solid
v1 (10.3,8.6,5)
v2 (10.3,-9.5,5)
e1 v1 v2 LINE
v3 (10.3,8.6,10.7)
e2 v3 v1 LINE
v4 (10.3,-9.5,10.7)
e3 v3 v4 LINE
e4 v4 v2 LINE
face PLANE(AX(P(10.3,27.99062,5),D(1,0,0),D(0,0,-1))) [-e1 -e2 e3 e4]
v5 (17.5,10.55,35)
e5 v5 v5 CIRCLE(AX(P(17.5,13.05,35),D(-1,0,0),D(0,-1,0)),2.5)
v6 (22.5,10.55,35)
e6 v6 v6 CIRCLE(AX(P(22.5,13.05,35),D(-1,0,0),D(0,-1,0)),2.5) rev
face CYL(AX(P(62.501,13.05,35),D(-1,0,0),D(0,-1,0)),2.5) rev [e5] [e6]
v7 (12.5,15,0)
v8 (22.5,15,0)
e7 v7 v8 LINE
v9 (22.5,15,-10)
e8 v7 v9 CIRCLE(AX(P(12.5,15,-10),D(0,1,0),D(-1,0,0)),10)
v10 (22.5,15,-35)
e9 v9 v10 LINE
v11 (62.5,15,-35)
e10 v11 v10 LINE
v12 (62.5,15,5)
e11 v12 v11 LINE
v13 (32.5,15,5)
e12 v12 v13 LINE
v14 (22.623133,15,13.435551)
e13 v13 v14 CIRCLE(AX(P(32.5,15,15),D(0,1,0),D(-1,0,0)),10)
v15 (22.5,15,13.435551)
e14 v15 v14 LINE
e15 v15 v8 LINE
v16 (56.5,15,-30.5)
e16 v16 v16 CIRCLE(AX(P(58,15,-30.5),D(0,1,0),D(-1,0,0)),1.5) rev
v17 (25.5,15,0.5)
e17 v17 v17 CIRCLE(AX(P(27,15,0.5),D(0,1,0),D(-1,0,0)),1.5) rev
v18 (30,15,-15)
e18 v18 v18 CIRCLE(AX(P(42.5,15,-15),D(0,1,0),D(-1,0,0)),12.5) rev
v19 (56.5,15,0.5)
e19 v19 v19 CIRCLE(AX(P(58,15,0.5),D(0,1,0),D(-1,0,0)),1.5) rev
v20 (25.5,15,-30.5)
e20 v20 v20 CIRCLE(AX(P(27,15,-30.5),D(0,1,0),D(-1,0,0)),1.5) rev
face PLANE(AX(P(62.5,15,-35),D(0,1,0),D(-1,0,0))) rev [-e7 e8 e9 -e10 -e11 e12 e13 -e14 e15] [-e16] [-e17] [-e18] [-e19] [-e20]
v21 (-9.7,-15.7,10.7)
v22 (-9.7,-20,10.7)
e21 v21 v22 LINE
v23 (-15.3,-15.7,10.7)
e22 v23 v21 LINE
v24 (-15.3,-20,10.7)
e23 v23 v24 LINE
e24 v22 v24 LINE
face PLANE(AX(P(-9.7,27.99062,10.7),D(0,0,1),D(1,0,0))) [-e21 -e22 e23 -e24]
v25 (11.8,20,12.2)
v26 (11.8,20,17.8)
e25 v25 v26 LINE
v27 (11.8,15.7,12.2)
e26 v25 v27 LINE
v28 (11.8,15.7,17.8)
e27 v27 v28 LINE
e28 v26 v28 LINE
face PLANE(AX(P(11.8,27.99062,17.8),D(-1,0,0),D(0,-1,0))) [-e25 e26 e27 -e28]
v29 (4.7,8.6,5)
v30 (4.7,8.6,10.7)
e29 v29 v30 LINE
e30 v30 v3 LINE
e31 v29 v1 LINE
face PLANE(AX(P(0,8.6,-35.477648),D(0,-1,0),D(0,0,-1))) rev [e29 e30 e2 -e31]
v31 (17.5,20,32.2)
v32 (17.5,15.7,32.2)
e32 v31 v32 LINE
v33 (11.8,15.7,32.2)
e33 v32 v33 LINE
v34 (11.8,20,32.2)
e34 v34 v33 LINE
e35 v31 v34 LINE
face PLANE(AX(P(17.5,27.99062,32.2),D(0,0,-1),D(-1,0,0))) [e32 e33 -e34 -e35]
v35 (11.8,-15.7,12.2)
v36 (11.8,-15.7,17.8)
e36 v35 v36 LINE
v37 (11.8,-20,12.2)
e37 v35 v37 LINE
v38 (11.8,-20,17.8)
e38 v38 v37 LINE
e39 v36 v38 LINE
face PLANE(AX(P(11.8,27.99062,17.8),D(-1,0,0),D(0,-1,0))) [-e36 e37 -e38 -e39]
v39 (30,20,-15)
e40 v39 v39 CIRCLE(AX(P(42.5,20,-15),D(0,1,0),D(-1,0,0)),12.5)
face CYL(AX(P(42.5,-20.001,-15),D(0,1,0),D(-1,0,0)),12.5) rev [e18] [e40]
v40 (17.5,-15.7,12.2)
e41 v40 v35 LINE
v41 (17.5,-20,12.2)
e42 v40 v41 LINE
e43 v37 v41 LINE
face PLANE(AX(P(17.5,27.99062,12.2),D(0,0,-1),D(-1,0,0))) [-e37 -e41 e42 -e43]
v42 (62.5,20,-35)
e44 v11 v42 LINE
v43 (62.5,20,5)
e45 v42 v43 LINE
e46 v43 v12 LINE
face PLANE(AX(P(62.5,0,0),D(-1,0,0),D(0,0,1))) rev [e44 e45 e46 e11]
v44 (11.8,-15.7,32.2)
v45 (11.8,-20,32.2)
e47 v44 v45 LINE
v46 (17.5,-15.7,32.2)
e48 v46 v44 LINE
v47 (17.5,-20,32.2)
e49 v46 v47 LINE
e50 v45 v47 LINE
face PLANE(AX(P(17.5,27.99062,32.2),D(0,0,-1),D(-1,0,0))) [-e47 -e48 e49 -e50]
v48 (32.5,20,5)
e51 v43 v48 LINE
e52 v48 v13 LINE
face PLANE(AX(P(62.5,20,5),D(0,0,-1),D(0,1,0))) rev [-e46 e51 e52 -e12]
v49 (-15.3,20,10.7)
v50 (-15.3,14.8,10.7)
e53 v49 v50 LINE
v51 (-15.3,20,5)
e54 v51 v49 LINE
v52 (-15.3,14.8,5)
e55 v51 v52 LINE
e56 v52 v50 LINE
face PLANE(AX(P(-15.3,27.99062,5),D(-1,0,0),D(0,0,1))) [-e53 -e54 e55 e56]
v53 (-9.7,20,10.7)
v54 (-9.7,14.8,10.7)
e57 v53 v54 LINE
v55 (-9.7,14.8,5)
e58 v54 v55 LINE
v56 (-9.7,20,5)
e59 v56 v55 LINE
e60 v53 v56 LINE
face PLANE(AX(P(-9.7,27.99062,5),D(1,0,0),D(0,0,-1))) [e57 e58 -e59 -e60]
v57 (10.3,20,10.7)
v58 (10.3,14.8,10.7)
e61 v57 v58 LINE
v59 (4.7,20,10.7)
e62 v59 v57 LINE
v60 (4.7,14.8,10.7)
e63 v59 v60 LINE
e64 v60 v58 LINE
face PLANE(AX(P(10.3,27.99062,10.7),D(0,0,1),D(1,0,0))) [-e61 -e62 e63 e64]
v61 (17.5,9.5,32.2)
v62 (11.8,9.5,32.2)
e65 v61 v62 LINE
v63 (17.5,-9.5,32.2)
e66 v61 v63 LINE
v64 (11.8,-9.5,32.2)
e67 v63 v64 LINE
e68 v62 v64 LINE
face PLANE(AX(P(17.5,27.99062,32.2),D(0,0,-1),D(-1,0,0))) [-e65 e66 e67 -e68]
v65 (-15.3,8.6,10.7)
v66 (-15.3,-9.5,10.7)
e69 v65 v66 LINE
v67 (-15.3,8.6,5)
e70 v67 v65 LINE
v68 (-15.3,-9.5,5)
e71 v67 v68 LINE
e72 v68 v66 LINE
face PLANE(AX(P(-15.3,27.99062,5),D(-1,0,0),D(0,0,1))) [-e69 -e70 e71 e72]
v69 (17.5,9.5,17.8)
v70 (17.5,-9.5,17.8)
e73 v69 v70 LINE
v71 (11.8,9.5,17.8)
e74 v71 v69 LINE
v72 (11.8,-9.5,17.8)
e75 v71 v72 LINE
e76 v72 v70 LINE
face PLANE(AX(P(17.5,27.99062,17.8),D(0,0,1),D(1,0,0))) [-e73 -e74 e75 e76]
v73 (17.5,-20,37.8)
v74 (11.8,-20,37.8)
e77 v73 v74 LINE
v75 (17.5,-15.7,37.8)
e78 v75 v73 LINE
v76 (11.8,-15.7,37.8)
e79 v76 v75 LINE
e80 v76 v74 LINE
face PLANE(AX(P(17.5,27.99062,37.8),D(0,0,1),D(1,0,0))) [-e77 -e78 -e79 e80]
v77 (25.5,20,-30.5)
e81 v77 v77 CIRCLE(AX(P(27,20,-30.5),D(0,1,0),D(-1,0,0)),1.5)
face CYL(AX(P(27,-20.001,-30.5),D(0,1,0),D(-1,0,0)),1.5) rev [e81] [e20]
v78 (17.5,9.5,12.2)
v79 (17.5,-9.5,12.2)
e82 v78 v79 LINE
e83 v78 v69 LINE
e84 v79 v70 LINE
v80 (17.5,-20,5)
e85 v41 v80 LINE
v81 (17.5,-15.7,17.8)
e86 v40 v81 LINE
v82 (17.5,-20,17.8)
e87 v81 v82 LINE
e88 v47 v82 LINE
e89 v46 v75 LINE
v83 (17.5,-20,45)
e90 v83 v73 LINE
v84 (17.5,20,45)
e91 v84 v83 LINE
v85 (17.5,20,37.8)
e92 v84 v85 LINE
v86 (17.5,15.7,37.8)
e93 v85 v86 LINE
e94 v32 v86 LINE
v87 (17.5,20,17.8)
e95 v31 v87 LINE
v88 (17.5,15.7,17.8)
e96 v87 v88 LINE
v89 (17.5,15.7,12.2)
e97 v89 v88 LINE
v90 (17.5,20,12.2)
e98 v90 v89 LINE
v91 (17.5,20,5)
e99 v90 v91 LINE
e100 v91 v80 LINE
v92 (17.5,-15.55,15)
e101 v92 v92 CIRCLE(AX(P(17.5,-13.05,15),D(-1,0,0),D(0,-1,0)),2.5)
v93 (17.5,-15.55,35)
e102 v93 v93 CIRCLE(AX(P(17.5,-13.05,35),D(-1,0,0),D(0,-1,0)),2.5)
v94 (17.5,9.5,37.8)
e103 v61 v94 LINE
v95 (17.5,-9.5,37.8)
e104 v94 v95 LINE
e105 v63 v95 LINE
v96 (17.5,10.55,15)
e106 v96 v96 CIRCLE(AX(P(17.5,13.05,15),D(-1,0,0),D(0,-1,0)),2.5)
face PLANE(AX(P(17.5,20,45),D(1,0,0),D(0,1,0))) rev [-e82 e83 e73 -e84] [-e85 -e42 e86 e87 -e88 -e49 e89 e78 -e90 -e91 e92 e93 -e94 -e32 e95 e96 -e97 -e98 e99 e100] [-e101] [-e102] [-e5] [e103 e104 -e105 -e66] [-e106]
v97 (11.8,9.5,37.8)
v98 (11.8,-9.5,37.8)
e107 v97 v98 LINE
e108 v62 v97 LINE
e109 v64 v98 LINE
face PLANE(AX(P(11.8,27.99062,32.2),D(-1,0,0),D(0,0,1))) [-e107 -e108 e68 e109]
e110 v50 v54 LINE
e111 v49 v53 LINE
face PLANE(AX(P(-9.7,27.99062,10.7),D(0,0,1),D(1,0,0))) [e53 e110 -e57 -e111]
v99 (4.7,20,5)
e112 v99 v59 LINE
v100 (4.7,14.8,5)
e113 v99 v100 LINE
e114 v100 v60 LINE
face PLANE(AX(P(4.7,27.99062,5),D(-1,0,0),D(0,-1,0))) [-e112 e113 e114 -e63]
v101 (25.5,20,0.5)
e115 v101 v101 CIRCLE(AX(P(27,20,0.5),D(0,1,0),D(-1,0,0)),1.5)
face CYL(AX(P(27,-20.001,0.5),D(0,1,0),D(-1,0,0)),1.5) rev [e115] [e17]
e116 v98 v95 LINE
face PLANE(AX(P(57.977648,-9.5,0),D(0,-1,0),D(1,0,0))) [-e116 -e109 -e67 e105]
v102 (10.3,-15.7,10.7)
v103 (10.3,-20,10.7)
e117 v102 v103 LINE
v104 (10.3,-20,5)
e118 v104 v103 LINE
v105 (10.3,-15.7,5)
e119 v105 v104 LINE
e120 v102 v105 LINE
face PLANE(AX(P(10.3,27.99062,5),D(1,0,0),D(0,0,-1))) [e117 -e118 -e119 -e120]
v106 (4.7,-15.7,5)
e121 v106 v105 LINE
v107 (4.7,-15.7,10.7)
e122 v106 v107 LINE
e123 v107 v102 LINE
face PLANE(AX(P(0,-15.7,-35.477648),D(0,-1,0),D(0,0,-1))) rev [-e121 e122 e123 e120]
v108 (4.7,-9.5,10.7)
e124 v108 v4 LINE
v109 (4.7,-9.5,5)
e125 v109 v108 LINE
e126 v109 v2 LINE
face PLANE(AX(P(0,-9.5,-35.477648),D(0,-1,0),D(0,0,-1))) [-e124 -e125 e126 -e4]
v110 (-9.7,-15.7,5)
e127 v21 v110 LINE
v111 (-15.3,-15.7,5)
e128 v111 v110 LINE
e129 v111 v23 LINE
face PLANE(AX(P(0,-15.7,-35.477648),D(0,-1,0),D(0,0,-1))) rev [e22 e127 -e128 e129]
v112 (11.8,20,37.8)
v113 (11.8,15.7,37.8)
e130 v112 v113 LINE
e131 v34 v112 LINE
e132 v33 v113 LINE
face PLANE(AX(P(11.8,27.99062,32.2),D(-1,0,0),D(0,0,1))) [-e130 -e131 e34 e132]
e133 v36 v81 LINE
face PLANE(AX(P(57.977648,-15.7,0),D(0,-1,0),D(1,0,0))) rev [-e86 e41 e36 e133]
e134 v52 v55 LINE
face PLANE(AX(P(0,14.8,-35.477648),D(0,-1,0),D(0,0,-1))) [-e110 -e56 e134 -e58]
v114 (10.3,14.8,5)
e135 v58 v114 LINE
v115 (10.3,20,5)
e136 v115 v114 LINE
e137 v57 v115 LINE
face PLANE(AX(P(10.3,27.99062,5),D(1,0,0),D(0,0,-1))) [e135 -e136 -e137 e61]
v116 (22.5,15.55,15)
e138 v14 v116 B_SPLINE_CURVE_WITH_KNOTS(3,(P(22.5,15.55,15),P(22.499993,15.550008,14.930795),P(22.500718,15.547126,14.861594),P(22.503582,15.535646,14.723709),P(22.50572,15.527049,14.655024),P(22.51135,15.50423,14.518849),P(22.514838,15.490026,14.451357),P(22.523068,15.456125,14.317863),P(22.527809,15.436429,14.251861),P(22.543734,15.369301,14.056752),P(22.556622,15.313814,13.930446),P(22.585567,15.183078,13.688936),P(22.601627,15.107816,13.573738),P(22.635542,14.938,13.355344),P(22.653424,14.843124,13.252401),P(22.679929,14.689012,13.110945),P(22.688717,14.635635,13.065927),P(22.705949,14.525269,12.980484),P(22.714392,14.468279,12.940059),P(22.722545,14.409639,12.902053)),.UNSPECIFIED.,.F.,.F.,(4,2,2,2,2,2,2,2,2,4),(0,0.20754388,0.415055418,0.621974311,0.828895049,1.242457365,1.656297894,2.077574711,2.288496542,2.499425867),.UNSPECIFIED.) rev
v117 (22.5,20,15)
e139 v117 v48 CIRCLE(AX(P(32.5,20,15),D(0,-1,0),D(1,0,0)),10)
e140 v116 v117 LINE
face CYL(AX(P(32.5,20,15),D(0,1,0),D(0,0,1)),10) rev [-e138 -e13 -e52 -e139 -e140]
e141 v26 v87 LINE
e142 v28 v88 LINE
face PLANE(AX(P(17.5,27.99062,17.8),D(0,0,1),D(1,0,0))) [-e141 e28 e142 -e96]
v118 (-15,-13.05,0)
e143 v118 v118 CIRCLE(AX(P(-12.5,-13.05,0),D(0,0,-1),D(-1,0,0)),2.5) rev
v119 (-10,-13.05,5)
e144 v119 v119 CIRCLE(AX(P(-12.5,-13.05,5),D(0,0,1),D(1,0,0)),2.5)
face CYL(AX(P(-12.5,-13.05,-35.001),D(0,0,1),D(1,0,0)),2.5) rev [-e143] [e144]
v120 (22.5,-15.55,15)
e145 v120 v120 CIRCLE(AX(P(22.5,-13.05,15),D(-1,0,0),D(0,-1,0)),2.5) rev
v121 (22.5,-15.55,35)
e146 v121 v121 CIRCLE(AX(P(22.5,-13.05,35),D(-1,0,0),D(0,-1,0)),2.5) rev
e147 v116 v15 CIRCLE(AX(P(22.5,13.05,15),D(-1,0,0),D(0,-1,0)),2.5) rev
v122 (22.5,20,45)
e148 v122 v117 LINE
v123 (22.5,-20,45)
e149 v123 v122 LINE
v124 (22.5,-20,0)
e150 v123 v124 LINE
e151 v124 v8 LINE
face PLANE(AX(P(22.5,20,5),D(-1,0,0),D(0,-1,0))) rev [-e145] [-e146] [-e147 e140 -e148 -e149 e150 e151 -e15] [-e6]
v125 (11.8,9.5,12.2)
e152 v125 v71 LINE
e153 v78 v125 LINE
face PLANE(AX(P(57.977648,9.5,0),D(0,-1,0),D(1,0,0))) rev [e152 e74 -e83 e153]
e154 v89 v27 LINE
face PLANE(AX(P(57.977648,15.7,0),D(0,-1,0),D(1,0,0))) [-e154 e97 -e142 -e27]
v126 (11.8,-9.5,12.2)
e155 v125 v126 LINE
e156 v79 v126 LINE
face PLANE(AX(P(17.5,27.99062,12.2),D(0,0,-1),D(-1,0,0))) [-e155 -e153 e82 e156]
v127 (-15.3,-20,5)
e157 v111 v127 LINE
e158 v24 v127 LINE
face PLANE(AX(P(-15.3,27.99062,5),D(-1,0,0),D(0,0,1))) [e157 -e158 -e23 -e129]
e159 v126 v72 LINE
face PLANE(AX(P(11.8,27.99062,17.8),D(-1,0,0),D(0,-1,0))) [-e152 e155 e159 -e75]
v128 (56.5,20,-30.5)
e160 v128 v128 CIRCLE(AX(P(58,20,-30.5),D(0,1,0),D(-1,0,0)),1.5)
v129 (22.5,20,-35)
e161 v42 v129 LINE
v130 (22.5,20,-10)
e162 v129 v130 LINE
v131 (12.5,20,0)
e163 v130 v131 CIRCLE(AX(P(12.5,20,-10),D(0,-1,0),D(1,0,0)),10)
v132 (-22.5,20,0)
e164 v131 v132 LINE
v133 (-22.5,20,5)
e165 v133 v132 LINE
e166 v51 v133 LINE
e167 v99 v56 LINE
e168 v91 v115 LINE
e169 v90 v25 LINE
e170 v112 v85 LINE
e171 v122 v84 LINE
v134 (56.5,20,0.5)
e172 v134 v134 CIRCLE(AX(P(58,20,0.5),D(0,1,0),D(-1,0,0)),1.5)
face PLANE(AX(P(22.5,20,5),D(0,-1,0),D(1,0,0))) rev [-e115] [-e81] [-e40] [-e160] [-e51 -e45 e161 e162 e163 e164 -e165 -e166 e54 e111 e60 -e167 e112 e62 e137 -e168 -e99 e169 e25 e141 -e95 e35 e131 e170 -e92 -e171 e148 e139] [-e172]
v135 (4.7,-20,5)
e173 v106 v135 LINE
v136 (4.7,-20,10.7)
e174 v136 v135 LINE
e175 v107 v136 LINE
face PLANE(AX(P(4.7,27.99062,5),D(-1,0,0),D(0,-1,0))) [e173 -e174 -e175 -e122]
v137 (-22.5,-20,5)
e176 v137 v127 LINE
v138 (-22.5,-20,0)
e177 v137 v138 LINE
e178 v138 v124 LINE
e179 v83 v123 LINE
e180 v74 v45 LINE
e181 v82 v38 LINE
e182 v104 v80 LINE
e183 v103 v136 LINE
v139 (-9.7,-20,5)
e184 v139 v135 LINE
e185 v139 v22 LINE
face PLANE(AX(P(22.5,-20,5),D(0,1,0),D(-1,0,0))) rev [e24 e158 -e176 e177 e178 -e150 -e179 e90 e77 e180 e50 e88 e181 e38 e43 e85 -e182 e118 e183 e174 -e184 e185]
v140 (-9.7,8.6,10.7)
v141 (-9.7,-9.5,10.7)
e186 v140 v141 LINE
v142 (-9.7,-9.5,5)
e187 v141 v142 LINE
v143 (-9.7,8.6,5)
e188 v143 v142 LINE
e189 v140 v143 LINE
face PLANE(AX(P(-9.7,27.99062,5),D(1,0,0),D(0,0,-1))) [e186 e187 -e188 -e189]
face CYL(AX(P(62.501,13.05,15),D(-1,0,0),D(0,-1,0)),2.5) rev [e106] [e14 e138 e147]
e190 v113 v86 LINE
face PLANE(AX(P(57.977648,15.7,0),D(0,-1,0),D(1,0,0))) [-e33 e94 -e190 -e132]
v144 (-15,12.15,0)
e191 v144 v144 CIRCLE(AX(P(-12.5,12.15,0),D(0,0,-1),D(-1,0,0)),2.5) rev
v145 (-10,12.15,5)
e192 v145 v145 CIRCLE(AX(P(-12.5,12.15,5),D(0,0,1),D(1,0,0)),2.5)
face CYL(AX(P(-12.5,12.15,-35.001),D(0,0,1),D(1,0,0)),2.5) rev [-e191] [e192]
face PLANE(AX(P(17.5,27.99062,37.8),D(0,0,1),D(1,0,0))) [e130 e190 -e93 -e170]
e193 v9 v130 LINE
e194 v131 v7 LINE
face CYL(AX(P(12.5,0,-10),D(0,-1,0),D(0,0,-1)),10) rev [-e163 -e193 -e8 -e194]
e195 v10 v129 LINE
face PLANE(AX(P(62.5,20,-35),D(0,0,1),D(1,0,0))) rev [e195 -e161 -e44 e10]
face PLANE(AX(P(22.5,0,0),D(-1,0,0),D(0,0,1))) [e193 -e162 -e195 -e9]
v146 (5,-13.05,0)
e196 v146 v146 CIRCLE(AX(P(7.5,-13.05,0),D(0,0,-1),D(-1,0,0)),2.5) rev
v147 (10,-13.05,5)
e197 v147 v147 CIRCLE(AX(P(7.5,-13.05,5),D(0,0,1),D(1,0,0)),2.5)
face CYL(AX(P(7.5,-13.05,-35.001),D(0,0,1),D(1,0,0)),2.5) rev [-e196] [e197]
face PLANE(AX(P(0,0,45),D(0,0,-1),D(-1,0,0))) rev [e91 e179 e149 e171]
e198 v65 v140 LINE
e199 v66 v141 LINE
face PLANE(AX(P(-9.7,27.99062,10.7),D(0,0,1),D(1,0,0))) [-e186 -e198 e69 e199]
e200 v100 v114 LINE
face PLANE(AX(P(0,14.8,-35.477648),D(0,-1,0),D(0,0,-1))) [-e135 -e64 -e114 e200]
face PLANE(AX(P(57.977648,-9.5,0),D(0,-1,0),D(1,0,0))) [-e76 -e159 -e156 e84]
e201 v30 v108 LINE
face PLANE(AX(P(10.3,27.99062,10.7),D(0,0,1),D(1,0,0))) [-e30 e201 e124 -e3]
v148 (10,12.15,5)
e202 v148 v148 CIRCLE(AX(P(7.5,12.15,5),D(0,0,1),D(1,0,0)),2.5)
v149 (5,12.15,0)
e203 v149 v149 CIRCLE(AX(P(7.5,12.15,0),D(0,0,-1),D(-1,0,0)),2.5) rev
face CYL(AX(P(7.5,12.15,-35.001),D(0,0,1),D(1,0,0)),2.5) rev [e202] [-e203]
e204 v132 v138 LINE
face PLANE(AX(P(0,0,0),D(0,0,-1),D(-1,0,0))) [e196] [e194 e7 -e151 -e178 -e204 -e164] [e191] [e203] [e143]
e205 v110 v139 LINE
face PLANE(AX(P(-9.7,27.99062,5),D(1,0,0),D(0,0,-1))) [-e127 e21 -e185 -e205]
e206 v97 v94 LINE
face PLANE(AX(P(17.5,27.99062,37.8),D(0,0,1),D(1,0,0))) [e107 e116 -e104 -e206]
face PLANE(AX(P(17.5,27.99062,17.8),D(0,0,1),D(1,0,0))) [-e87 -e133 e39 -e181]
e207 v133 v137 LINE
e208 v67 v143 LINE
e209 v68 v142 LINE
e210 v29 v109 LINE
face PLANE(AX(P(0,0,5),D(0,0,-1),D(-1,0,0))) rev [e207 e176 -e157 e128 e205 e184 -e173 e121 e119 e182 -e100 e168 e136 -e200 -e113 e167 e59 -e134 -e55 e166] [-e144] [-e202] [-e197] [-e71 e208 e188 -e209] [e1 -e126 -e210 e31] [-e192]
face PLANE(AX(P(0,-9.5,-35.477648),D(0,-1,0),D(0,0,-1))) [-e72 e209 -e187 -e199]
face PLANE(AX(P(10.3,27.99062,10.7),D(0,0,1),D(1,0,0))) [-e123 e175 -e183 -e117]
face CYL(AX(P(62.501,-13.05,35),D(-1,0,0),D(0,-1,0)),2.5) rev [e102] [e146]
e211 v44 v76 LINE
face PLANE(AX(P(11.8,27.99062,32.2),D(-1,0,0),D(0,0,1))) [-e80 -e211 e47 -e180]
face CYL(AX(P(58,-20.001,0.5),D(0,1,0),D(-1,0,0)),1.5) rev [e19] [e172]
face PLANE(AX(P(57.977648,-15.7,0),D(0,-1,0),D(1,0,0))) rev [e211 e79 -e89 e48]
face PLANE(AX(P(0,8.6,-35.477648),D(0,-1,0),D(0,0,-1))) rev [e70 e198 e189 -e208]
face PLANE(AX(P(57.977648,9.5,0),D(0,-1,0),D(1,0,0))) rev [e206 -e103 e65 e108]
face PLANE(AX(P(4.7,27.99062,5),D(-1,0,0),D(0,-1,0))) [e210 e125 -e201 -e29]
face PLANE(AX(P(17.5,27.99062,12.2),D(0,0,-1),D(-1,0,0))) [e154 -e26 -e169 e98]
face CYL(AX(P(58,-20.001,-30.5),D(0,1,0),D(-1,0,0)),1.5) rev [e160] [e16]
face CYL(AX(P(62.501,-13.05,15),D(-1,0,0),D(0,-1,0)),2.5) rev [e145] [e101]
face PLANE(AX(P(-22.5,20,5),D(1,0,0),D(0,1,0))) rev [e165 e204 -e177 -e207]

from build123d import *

# Parameters (mm, degrees)
CROQUIS1_W              = 45
CROQUIS1_H              = 40
SALIENTE_EXTRUIR1_DEPTH = 5
CROQUIS2_W              = 5
CROQUIS2_H              = 40
SALIENTE_EXTRUIR2_DEPTH = 40
CROQUIS13_W             = 40
CROQUIS13_H             = 5
SALIENTE_EXTRUIR7_DEPTH = 40
CORTAR_EXTRUIR3_REACH   = 88.783
CROQUIS15_R             = 12.5
CORTAR_EXTRUIR4_REACH   = 88.783
CROQUIS18_R             = 1.5
CROQUIS24_W             = 5.6
CROQUIS24_H             = 5.7
CROQUIS24_W_2           = 5.7
CROQUIS24_H_2           = 5.6
SALIENTE_EXTRUIR8_DEPTH = 40
CROQUIS20_W             = 40
CROQUIS20_H             = 6.2
CORTAR_EXTRUIR5_DEPTH   = 5.7
CROQUIS21_W             = 40
CROQUIS21_H             = 6.2
CORTAR_EXTRUIR6_DEPTH   = 5.7
CORTAR_EXTRUIR7_REACH   = 68.708
CROQUIS22_R             = 2.5
CORTAR_EXTRUIR8_REACH   = 78.852
CROQUIS23_R             = 2.5
REDONDEO1_R             = 10
REDONDEO2_R             = 10


with BuildPart() as part:
    # Croquis1 → Saliente-Extruir1 (new body)
    with BuildSketch(Plane.XY):
        Rectangle(CROQUIS1_W, CROQUIS1_H)
    extrude(amount=SALIENTE_EXTRUIR1_DEPTH)

    # Croquis2 → Saliente-Extruir2 (add)
    with BuildSketch(Plane.XY.offset(5)):
        with Locations((20, 0)):
            Rectangle(CROQUIS2_W, CROQUIS2_H)
    extrude(amount=SALIENTE_EXTRUIR2_DEPTH)

    # Croquis13 → Saliente-Extruir7 (add)
    with BuildSketch(Plane(origin=(22.5, 0, 0), x_dir=(0, 0, -1), z_dir=(1, 0, 0))):
        with Locations((15, 17.5)):
            Rectangle(CROQUIS13_W, CROQUIS13_H)
    extrude(amount=SALIENTE_EXTRUIR7_DEPTH)

    # Croquis15 → Cortar-Extruir3 (cut, up to next)
    with BuildSketch(Plane(origin=(0, 20, 0), x_dir=(1, 0, 0), z_dir=(0, 1, 0)), mode=Mode.PRIVATE) as cortar_extruir3_sk1:
        with Locations(Location((42.5, 15, 0), (0, 0, 180))):
            Circle(CROQUIS15_R)
    cortar_extruir3_tool1 = extrude(cortar_extruir3_sk1.sketch, amount=-CORTAR_EXTRUIR3_REACH, mode=Mode.PRIVATE) & part.part
    add(cortar_extruir3_tool1.solids().sort_by_distance((42.5, 20, -15))[0], mode=Mode.SUBTRACT)

    # Croquis18 → Cortar-Extruir4 (cut, up to next)
    with BuildSketch(Plane(origin=(0, 20, 0), x_dir=(1, 0, 0), z_dir=(0, 1, 0)), mode=Mode.PRIVATE) as cortar_extruir4_sk1:
        with Locations(Location((27, 30.5, 0), (0, 0, 180))):
            Circle(CROQUIS18_R)
    cortar_extruir4_tool1 = extrude(cortar_extruir4_sk1.sketch, amount=-CORTAR_EXTRUIR4_REACH, mode=Mode.PRIVATE) & part.part
    # Croquis18 → Cortar-Extruir4 (cut, up to next)
    with BuildSketch(Plane(origin=(0, 20, 0), x_dir=(1, 0, 0), z_dir=(0, 1, 0)), mode=Mode.PRIVATE) as cortar_extruir4_sk2:
        with Locations(Location((58, 30.5, 0), (0, 0, 180))):
            Circle(CROQUIS18_R)
    cortar_extruir4_tool2 = extrude(cortar_extruir4_sk2.sketch, amount=-CORTAR_EXTRUIR4_REACH, mode=Mode.PRIVATE) & part.part
    # Croquis18 → Cortar-Extruir4 (cut, up to next)
    with BuildSketch(Plane(origin=(0, 20, 0), x_dir=(1, 0, 0), z_dir=(0, 1, 0)), mode=Mode.PRIVATE) as cortar_extruir4_sk3:
        with Locations(Location((58, -0.5, 0), (0, 0, 180))):
            Circle(CROQUIS18_R)
    cortar_extruir4_tool3 = extrude(cortar_extruir4_sk3.sketch, amount=-CORTAR_EXTRUIR4_REACH, mode=Mode.PRIVATE) & part.part
    # Croquis18 → Cortar-Extruir4 (cut, up to next)
    with BuildSketch(Plane(origin=(0, 20, 0), x_dir=(1, 0, 0), z_dir=(0, 1, 0)), mode=Mode.PRIVATE) as cortar_extruir4_sk4:
        with Locations(Location((27, -0.5, 0), (0, 0, 180))):
            Circle(CROQUIS18_R)
    cortar_extruir4_tool4 = extrude(cortar_extruir4_sk4.sketch, amount=-CORTAR_EXTRUIR4_REACH, mode=Mode.PRIVATE) & part.part
    add(cortar_extruir4_tool1.solids().sort_by_distance((27, 20, -30.5))[0], mode=Mode.SUBTRACT)
    add(cortar_extruir4_tool2.solids().sort_by_distance((58, 20, -30.5))[0], mode=Mode.SUBTRACT)
    add(cortar_extruir4_tool3.solids().sort_by_distance((58, 20, 0.5))[0], mode=Mode.SUBTRACT)
    add(cortar_extruir4_tool4.solids().sort_by_distance((27, 20, 0.5))[0], mode=Mode.SUBTRACT)

    # Croquis24 → Saliente-Extruir8 (add)
    with BuildSketch(Plane(origin=(0, -20, 0), x_dir=(-1, 0, 0), z_dir=(0, -1, 0))):
        with Locations((12.5, -7.85)):
            Rectangle(CROQUIS24_W, CROQUIS24_H)
        with Locations((-7.5, -7.85)):
            Rectangle(CROQUIS24_W, CROQUIS24_H)
        with Locations((-14.65, -35)):
            Rectangle(CROQUIS24_W_2, CROQUIS24_H_2)
        with Locations((-14.65, -15)):
            Rectangle(CROQUIS24_W_2, CROQUIS24_H_2)
    extrude(amount=-SALIENTE_EXTRUIR8_DEPTH)

    # Croquis20 → Cortar-Extruir5 (cut)
    with BuildSketch(Plane.ZY.offset(-11.8)):
        with Locations((25, -12.6)):
            Rectangle(CROQUIS20_W, CROQUIS20_H)
        with Locations((25, 12.6)):
            Rectangle(CROQUIS20_W, CROQUIS20_H)
    extrude(amount=-CORTAR_EXTRUIR5_DEPTH, mode=Mode.SUBTRACT)

    # Croquis21 → Cortar-Extruir6 (cut)
    with BuildSketch(Plane.XY.offset(10.7)):
        with Locations((-2.5, -12.6)):
            Rectangle(CROQUIS21_W, CROQUIS21_H)
        with Locations((-2.5, 11.7)):
            Rectangle(CROQUIS21_W, CROQUIS21_H)
    extrude(amount=-CORTAR_EXTRUIR6_DEPTH, mode=Mode.SUBTRACT)

    # Croquis22 → Cortar-Extruir7 (cut, up to next)
    with BuildSketch(Plane.ZY.offset(-17.5), mode=Mode.PRIVATE) as cortar_extruir7_sk1:
        with Locations(Location((15, 13.05, 0), (0, 0, 270))):
            Circle(CROQUIS22_R)
    cortar_extruir7_tool1 = extrude(cortar_extruir7_sk1.sketch, amount=-CORTAR_EXTRUIR7_REACH, mode=Mode.PRIVATE) & part.part
    # Croquis22 → Cortar-Extruir7 (cut, up to next)
    with BuildSketch(Plane.ZY.offset(-17.5), mode=Mode.PRIVATE) as cortar_extruir7_sk2:
        with Locations(Location((35, 13.05, 0), (0, 0, 270))):
            Circle(CROQUIS22_R)
    cortar_extruir7_tool2 = extrude(cortar_extruir7_sk2.sketch, amount=-CORTAR_EXTRUIR7_REACH, mode=Mode.PRIVATE) & part.part
    # Croquis22 → Cortar-Extruir7 (cut, up to next)
    with BuildSketch(Plane.ZY.offset(-17.5), mode=Mode.PRIVATE) as cortar_extruir7_sk3:
        with Locations(Location((15, -13.05, 0), (0, 0, 270))):
            Circle(CROQUIS22_R)
    cortar_extruir7_tool3 = extrude(cortar_extruir7_sk3.sketch, amount=-CORTAR_EXTRUIR7_REACH, mode=Mode.PRIVATE) & part.part
    # Croquis22 → Cortar-Extruir7 (cut, up to next)
    with BuildSketch(Plane.ZY.offset(-17.5), mode=Mode.PRIVATE) as cortar_extruir7_sk4:
        with Locations(Location((35, -13.05, 0), (0, 0, 270))):
            Circle(CROQUIS22_R)
    cortar_extruir7_tool4 = extrude(cortar_extruir7_sk4.sketch, amount=-CORTAR_EXTRUIR7_REACH, mode=Mode.PRIVATE) & part.part
    add(cortar_extruir7_tool1.solids().sort_by_distance((17.5, 13.05, 15))[0], mode=Mode.SUBTRACT)
    add(cortar_extruir7_tool2.solids().sort_by_distance((17.5, 13.05, 35))[0], mode=Mode.SUBTRACT)
    add(cortar_extruir7_tool3.solids().sort_by_distance((17.5, -13.05, 15))[0], mode=Mode.SUBTRACT)
    add(cortar_extruir7_tool4.solids().sort_by_distance((17.5, -13.05, 35))[0], mode=Mode.SUBTRACT)

    # Croquis23 → Cortar-Extruir8 (cut, up to next)
    with BuildSketch(Plane.XY.offset(5), mode=Mode.PRIVATE) as cortar_extruir8_sk1:
        with Locations((-12.5, 12.15)):
            Circle(CROQUIS23_R)
    cortar_extruir8_tool1 = extrude(cortar_extruir8_sk1.sketch, amount=-CORTAR_EXTRUIR8_REACH, mode=Mode.PRIVATE) & part.part
    # Croquis23 → Cortar-Extruir8 (cut, up to next)
    with BuildSketch(Plane.XY.offset(5), mode=Mode.PRIVATE) as cortar_extruir8_sk2:
        with Locations((7.5, 12.15)):
            Circle(CROQUIS23_R)
    cortar_extruir8_tool2 = extrude(cortar_extruir8_sk2.sketch, amount=-CORTAR_EXTRUIR8_REACH, mode=Mode.PRIVATE) & part.part
    # Croquis23 → Cortar-Extruir8 (cut, up to next)
    with BuildSketch(Plane.XY.offset(5), mode=Mode.PRIVATE) as cortar_extruir8_sk3:
        with Locations((-12.5, -13.05)):
            Circle(CROQUIS23_R)
    cortar_extruir8_tool3 = extrude(cortar_extruir8_sk3.sketch, amount=-CORTAR_EXTRUIR8_REACH, mode=Mode.PRIVATE) & part.part
    # Croquis23 → Cortar-Extruir8 (cut, up to next)
    with BuildSketch(Plane.XY.offset(5), mode=Mode.PRIVATE) as cortar_extruir8_sk4:
        with Locations((7.5, -13.05)):
            Circle(CROQUIS23_R)
    cortar_extruir8_tool4 = extrude(cortar_extruir8_sk4.sketch, amount=-CORTAR_EXTRUIR8_REACH, mode=Mode.PRIVATE) & part.part
    add(cortar_extruir8_tool1.solids().sort_by_distance((-12.5, 12.15, 5))[0], mode=Mode.SUBTRACT)
    add(cortar_extruir8_tool2.solids().sort_by_distance((7.5, 12.15, 5))[0], mode=Mode.SUBTRACT)
    add(cortar_extruir8_tool3.solids().sort_by_distance((-12.5, -13.05, 5))[0], mode=Mode.SUBTRACT)
    add(cortar_extruir8_tool4.solids().sort_by_distance((7.5, -13.05, 5))[0], mode=Mode.SUBTRACT)

    # Redondeo1
    # the kernel refuses this fillet: 10 mm, written as the material it adds along each edge
    with BuildSketch(Plane(origin=(22.5, 20, 5), x_dir=(0, 0, 1), z_dir=(0, -1, 0))) as redondeo1_piece_1_section:
        with BuildLine():
            CenterArc((REDONDEO1_R, -REDONDEO1_R), REDONDEO1_R, 90, 90)
            Line((0, -REDONDEO1_R), (0, 0))
            Line((0, 0), (REDONDEO1_R, 0))
        make_face()
    redondeo1_piece_1 = extrude(amount=5, mode=Mode.PRIVATE)
    redondeo1_piece_1 = redondeo1_piece_1 - Plane(origin=(24.766392733, 13.05, 15), x_dir=(0, -1, 0), z_dir=(-1, 0, 0)) * Cylinder(2.5, 50, mode=Mode.PRIVATE)
    add(redondeo1_piece_1)

    # Redondeo2
    redondeo2_edges = [part.edges().sort_by_distance(p)[0] for p in [
        (22.5, 17.5, 0),
    ]]
    fillet(redondeo2_edges, radius=REDONDEO2_R)


solid = part.part
